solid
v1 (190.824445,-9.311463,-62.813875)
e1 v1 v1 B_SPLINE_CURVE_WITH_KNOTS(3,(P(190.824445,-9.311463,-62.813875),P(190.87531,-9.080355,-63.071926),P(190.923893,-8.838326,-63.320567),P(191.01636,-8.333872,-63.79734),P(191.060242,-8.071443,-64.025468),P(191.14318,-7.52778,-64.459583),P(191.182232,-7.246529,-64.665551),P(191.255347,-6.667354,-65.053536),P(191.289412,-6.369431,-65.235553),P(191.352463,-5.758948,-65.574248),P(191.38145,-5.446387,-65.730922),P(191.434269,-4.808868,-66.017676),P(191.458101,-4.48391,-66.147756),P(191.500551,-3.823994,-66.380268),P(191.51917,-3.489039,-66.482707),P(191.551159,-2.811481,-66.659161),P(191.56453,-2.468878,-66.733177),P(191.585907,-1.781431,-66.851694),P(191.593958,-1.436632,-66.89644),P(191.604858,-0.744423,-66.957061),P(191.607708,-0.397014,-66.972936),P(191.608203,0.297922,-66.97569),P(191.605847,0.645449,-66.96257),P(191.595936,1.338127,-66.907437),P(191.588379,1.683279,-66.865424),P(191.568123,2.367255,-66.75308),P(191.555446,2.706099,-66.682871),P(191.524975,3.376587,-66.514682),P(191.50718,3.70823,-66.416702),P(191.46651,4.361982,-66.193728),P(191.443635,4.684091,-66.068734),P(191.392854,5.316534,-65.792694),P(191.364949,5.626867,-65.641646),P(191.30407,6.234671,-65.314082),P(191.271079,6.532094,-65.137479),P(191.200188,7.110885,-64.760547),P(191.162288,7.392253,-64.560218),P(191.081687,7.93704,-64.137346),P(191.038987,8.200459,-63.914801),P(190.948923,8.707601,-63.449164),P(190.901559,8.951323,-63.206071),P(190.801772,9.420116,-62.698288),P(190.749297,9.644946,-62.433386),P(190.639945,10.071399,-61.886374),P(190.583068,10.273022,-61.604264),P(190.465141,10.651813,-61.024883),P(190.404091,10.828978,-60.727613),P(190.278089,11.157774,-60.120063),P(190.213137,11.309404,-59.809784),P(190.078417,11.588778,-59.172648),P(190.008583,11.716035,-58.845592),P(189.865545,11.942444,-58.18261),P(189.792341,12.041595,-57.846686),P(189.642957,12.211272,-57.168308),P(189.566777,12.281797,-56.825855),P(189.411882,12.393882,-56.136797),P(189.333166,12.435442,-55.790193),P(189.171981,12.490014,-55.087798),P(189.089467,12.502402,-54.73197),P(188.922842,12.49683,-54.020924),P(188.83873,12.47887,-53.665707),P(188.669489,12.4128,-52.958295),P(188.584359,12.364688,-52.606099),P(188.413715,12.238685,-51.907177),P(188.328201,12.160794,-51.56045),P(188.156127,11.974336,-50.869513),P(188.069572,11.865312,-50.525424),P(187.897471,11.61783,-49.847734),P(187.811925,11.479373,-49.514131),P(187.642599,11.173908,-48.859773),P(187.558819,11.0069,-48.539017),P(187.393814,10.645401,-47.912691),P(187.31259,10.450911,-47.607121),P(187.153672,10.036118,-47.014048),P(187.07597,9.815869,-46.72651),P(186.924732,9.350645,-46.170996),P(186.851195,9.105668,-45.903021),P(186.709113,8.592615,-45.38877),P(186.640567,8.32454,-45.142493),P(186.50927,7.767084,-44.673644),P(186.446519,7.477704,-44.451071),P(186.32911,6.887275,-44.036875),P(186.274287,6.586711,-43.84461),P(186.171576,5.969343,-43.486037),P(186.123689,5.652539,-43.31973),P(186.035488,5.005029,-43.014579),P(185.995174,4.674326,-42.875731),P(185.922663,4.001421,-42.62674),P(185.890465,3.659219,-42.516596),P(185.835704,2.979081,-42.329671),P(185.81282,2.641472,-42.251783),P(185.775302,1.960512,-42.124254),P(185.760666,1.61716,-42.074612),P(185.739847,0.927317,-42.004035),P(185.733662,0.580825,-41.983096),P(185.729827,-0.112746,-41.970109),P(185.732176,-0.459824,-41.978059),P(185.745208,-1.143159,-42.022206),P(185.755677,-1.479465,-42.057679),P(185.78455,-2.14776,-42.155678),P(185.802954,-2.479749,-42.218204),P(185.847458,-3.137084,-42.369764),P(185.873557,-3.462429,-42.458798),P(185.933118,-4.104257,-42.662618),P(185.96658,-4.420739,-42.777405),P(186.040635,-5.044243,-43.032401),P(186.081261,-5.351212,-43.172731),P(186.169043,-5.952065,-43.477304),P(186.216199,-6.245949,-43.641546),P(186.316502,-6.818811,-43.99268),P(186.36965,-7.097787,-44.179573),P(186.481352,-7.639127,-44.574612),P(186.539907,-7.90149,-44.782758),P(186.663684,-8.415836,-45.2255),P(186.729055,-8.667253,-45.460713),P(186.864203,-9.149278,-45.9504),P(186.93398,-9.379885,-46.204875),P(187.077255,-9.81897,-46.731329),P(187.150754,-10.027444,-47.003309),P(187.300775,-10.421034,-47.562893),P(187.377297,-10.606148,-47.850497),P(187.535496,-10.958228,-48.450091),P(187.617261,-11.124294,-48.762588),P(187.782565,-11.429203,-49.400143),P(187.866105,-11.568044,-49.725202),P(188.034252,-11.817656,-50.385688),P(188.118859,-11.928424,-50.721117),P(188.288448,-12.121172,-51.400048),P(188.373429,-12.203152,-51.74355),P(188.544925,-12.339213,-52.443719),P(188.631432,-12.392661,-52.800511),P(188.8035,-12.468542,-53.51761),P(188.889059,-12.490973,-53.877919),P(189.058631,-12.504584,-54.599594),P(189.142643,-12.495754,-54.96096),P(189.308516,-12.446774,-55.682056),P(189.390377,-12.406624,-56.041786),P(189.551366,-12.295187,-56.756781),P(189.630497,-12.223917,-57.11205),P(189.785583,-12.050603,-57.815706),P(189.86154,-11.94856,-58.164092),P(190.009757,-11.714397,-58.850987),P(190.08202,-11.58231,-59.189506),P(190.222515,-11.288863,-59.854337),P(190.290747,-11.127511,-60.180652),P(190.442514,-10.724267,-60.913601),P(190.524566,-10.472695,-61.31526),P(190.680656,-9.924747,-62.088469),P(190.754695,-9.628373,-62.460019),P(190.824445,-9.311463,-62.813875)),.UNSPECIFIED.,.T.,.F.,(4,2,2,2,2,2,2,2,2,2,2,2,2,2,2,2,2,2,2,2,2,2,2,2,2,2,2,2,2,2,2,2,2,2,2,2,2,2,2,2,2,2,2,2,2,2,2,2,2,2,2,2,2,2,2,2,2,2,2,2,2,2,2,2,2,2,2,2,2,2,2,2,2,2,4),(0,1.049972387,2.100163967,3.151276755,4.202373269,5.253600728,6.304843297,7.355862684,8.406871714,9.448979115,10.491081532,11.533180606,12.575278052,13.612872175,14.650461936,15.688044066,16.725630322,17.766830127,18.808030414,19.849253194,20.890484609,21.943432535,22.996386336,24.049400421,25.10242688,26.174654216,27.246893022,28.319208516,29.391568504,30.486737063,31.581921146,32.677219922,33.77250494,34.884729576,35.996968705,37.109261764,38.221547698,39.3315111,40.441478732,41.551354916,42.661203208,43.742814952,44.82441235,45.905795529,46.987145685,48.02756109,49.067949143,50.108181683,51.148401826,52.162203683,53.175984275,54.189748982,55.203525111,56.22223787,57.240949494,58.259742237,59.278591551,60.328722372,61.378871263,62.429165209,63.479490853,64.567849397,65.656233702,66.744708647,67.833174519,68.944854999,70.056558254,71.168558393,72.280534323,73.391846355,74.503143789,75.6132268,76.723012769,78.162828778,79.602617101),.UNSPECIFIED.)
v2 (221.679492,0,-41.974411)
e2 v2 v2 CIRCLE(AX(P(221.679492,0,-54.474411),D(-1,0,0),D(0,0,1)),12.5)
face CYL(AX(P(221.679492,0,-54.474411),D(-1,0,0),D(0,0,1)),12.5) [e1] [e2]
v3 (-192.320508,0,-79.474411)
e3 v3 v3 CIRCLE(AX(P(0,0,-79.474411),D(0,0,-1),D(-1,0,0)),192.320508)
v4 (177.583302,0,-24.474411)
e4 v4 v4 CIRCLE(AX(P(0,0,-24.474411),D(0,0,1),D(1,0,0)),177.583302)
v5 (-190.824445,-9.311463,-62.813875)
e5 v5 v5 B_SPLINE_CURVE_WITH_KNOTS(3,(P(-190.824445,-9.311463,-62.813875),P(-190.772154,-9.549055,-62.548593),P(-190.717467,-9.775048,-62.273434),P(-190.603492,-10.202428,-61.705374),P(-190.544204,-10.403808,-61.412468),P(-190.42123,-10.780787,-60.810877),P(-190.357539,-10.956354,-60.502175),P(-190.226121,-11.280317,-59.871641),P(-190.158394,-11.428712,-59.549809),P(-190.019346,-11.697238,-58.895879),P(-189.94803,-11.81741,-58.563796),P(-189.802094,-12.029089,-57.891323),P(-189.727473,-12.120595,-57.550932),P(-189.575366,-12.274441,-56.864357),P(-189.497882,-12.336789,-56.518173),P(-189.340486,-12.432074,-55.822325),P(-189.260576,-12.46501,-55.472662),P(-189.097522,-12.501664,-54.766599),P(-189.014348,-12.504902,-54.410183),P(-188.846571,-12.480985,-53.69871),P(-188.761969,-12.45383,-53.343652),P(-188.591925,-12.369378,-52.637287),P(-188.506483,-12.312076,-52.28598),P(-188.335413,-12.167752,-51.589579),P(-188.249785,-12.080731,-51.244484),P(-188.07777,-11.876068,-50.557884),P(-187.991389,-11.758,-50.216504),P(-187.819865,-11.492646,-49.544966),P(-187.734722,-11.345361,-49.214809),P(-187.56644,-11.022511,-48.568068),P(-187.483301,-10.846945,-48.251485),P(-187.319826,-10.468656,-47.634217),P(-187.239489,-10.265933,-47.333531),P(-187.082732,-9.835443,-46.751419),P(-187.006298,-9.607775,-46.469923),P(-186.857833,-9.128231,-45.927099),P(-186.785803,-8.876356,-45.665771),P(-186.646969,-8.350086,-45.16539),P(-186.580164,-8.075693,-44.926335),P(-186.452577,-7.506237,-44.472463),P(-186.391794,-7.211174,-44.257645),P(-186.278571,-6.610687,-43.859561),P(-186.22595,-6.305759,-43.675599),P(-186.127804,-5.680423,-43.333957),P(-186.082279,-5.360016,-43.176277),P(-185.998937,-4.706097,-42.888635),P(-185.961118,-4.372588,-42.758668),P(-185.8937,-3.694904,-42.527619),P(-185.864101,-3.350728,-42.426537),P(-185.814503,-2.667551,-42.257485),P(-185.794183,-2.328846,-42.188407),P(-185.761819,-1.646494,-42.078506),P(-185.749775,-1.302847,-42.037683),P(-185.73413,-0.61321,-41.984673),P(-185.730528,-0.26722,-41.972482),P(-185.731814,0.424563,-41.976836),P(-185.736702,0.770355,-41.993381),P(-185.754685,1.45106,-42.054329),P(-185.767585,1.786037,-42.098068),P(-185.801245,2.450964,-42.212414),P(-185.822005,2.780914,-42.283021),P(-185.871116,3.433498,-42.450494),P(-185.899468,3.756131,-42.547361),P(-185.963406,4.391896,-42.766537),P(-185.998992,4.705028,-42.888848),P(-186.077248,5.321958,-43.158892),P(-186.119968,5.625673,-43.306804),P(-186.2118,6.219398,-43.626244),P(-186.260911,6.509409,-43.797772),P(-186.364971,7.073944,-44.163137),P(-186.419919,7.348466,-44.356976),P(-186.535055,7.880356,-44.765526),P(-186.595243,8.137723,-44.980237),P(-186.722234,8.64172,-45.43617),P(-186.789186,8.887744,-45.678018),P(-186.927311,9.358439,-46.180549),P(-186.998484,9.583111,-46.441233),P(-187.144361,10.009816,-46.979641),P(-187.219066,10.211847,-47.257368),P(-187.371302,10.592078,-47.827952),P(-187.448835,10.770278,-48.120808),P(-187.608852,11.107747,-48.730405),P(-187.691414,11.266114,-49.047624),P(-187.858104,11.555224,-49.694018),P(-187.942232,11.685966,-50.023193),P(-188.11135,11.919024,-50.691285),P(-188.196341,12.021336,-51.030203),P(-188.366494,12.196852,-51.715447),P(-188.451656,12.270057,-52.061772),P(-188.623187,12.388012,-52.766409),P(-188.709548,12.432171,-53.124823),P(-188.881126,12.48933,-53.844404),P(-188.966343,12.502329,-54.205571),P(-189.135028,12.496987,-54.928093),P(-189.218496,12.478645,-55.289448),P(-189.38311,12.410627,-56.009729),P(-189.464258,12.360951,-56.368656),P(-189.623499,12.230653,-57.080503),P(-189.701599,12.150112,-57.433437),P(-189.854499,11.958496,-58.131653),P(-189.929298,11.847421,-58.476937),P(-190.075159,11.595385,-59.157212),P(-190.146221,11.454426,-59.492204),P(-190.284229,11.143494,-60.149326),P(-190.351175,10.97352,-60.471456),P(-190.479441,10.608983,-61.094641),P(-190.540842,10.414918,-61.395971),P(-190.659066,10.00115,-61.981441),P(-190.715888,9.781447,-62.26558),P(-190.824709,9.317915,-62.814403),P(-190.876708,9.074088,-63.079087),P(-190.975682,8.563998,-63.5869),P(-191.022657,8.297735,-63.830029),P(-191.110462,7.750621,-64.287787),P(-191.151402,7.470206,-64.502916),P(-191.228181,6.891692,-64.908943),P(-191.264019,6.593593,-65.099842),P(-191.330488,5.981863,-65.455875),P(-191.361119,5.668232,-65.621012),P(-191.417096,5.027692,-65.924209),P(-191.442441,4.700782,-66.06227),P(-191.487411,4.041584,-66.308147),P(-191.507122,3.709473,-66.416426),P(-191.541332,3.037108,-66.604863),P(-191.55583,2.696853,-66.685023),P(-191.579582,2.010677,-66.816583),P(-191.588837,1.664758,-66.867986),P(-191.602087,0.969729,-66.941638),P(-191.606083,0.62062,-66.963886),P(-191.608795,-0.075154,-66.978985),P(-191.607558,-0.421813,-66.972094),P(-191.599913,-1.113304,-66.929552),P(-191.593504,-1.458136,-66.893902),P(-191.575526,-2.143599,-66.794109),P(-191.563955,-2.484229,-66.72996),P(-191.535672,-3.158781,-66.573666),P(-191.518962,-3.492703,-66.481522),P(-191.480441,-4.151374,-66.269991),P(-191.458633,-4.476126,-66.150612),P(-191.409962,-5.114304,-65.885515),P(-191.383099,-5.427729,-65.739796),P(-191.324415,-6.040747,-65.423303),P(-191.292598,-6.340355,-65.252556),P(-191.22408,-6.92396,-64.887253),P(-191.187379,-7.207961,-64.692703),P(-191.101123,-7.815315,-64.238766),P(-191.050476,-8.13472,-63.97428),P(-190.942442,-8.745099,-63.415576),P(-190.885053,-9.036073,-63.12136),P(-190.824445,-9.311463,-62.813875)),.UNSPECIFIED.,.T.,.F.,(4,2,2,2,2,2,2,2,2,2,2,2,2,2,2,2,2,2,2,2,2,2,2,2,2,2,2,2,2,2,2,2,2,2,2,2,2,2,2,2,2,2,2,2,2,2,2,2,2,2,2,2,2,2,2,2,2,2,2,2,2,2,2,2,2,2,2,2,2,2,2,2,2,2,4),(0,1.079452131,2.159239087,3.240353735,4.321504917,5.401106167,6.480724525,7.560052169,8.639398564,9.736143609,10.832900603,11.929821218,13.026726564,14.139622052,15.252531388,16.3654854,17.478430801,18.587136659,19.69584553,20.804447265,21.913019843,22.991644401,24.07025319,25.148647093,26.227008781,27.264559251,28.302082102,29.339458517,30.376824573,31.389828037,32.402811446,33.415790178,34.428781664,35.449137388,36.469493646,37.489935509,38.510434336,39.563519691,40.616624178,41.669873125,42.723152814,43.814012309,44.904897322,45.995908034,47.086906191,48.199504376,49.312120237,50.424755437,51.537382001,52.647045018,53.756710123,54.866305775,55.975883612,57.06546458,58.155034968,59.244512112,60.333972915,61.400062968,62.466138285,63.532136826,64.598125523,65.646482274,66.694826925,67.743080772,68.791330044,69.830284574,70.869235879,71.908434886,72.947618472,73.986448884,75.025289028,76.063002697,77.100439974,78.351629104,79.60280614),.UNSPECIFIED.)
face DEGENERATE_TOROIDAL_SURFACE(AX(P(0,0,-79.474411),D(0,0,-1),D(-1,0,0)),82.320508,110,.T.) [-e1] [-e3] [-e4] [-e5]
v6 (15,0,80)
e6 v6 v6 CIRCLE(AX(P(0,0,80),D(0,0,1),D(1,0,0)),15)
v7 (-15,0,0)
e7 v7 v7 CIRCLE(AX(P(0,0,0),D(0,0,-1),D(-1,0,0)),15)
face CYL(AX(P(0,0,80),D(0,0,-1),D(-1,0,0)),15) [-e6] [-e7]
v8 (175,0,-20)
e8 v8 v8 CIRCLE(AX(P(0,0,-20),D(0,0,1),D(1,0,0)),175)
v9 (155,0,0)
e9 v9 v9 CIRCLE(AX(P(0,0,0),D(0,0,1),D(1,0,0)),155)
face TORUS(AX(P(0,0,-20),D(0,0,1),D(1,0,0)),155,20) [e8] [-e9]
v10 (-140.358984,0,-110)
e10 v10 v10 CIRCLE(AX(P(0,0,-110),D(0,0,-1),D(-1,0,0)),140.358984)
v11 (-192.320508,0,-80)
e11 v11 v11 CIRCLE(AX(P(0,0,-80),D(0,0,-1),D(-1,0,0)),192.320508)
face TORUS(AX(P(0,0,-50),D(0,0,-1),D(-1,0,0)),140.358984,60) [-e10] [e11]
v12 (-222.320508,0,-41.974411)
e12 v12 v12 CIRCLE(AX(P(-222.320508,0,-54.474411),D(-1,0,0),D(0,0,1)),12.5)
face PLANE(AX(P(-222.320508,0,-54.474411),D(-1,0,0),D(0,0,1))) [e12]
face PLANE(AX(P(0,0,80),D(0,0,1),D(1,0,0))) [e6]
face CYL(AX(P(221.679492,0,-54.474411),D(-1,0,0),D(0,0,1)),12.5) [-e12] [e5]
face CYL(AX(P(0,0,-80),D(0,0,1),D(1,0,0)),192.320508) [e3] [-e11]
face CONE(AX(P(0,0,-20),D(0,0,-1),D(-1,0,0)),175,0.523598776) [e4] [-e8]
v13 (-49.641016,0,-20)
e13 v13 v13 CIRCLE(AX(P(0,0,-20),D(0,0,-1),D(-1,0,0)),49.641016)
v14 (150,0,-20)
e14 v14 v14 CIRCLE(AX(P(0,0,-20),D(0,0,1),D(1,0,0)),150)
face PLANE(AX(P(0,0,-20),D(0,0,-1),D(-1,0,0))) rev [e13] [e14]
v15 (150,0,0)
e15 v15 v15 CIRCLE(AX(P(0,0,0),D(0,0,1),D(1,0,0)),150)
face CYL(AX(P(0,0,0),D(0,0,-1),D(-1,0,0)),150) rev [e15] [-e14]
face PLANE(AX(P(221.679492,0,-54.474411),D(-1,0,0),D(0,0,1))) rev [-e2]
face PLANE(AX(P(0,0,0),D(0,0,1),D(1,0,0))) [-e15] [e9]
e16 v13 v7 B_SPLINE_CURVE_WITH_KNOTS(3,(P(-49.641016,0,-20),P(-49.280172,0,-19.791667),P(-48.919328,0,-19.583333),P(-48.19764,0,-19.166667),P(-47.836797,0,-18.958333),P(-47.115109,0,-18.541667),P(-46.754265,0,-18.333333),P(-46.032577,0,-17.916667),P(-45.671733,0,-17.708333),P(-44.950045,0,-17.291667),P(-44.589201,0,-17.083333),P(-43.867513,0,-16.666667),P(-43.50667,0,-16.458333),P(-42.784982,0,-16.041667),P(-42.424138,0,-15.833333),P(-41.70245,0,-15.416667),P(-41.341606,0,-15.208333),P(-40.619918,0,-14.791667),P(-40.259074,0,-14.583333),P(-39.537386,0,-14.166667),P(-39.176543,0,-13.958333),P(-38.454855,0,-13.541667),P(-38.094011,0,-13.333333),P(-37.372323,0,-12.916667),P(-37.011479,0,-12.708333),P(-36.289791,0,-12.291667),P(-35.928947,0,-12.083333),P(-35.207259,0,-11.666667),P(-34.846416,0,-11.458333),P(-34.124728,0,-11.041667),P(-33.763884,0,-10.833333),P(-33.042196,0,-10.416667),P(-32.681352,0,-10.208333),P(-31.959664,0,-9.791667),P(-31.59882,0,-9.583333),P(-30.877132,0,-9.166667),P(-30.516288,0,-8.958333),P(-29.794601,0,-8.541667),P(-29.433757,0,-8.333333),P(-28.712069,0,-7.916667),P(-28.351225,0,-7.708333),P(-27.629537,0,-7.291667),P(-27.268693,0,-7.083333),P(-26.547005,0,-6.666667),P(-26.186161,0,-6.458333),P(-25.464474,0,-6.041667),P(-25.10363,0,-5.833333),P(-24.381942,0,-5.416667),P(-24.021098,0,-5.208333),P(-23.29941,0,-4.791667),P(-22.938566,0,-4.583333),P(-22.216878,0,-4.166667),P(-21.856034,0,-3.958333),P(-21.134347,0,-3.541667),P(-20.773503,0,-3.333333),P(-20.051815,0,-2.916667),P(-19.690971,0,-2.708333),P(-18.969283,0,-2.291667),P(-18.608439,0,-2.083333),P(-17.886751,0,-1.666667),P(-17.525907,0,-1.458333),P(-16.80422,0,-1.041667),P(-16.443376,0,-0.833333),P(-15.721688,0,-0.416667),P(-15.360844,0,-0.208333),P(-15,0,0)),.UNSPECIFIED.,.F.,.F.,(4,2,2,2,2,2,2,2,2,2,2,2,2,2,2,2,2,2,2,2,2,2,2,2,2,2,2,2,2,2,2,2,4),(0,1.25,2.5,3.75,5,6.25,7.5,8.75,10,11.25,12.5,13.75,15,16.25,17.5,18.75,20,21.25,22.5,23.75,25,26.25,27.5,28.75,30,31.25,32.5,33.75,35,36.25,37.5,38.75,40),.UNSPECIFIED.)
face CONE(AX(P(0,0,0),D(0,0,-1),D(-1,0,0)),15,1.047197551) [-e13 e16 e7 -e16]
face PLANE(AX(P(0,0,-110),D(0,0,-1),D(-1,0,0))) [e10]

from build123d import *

# Parameters (mm, degrees)
SKETCH1_R                = 15
BOSS_EXTRUDE1_DEPTH      = 80
SKETCH2_R                = 15
BOSS_EXTRUDE2_DEPTH      = 20
BOSS_EXTRUDE2_DRAFT      = -60
SKETCH3_R                = 175
BOSS_EXTRUDE5_DEPTH      = 30
BOSS_EXTRUDE5_DRAFT      = -30
SKETCH6_R                = 175
SKETCH6_R_2              = 150
BOSS_EXTRUDE6_DEPTH      = 20
SKETCH7_R                = 192.320508076
BOSS_EXTRUDE7_DEPTH      = 30
SKETCH9_R                = 192.320508076
BOSS_EXTRUDE8_DEPTH      = 30
BOSS_EXTRUDE8_TAPER      = 30
FILLET2_R                = 60
FILLET3_R                = 110
FILLET4_R                = 20
BOSS_EXTRUDE9_DEPTH      = 30
BOSS_EXTRUDE9_DEPTH_BACK = 414
SKETCH10_R               = 12.5


with BuildPart() as part:
    # Sketch1 → Boss-Extrude1 (new body)
    with BuildSketch(Plane.XY):
        Circle(SKETCH1_R)
    extrude(amount=BOSS_EXTRUDE1_DEPTH)


with BuildPart() as boss_extrude2_tool:
    # Sketch2 → Boss-Extrude2 (with draft: the straight prism first)
    with BuildSketch(Plane(origin=(0, 0, 0), x_dir=(-1, 0, 0), z_dir=(0, 0, -1))):
        Circle(SKETCH2_R)
    extrude(amount=BOSS_EXTRUDE2_DEPTH)
    # Boss-Extrude2: the draft: its side faces are tilted about the plane it starts from
    boss_extrude2_sides = [boss_extrude2_tool.faces().sort_by_distance(p)[0] for p in [
        (15, 0, -10),
    ]]
    draft(boss_extrude2_sides, Plane(origin=(0, 0, 0), x_dir=(-1, 0, 0), z_dir=(0, 0, -1)), BOSS_EXTRUDE2_DRAFT)


with BuildPart() as part_1:
    add(part.part)

    # Boss-Extrude2: add boss_extrude2_tool
    add(boss_extrude2_tool.part)


with BuildPart() as boss_extrude5_tool:
    # Sketch3 → Boss-Extrude5 (with draft: the straight prism first)
    with BuildSketch(Plane(origin=(0, 0, -20), x_dir=(-1, 0, 0), z_dir=(0, 0, -1))):
        Circle(SKETCH3_R)
    extrude(amount=BOSS_EXTRUDE5_DEPTH)
    # Boss-Extrude5: the draft: its side faces are tilted about the plane it starts from
    boss_extrude5_sides = [boss_extrude5_tool.faces().sort_by_distance(p)[0] for p in [
        (175, 0, -35),
    ]]
    draft(boss_extrude5_sides, Plane(origin=(0, 0, -20), x_dir=(-1, 0, 0), z_dir=(0, 0, -1)), BOSS_EXTRUDE5_DRAFT)


with BuildPart() as part_2:
    add(part_1.part)

    # Boss-Extrude5: add boss_extrude5_tool
    add(boss_extrude5_tool.part)

    # Sketch6 → Boss-Extrude6 (add)
    with BuildSketch(Plane.XY.offset(-20)):
        Circle(SKETCH6_R)
        Circle(SKETCH6_R_2, mode=Mode.SUBTRACT)
    extrude(amount=BOSS_EXTRUDE6_DEPTH)

    # Sketch7 → Boss-Extrude7 (add)
    with BuildSketch(Plane(origin=(0, 0, -50), x_dir=(-1, 0, 0), z_dir=(0, 0, -1))):
        Circle(SKETCH7_R)
    extrude(amount=BOSS_EXTRUDE7_DEPTH)

    # Sketch9 → Boss-Extrude8 (add)
    with BuildSketch(Plane(origin=(0, 0, -80), x_dir=(-1, 0, 0), z_dir=(0, 0, -1))):
        Circle(SKETCH9_R)
    extrude(amount=BOSS_EXTRUDE8_DEPTH, taper=BOSS_EXTRUDE8_TAPER)

    # Fillet2
    fillet2_edges = [part_2.edges().sort_by_distance(p)[0] for p in [
        (175, 0, -110),
    ]]
    fillet(fillet2_edges, radius=FILLET2_R - 0.0001)  # a hair under: the kernel refuses the full size

    # Fillet3
    fillet3_edges = [part_2.edges().sort_by_distance(p)[0] for p in [
        (192.320508076, 0, -50),
    ]]
    fillet(fillet3_edges, radius=FILLET3_R)

    # Fillet4
    fillet4_edges = [part_2.edges().sort_by_distance(p)[0] for p in [
        (-175, 0, 0),
    ]]
    fillet(fillet4_edges, radius=FILLET4_R - 0.0001)  # a hair under: the kernel refuses the full size

    # Sketch10 → Boss-Extrude9 (add, two sides: drawn at the far end of the back side and taken through both)
    with BuildSketch(Plane.ZY.offset(192.320508076).offset(-BOSS_EXTRUDE9_DEPTH_BACK)):
        with Locations((-54.474411167, 0)):
            Circle(SKETCH10_R)
    extrude(amount=BOSS_EXTRUDE9_DEPTH + BOSS_EXTRUDE9_DEPTH_BACK)


solid = part_2.part
